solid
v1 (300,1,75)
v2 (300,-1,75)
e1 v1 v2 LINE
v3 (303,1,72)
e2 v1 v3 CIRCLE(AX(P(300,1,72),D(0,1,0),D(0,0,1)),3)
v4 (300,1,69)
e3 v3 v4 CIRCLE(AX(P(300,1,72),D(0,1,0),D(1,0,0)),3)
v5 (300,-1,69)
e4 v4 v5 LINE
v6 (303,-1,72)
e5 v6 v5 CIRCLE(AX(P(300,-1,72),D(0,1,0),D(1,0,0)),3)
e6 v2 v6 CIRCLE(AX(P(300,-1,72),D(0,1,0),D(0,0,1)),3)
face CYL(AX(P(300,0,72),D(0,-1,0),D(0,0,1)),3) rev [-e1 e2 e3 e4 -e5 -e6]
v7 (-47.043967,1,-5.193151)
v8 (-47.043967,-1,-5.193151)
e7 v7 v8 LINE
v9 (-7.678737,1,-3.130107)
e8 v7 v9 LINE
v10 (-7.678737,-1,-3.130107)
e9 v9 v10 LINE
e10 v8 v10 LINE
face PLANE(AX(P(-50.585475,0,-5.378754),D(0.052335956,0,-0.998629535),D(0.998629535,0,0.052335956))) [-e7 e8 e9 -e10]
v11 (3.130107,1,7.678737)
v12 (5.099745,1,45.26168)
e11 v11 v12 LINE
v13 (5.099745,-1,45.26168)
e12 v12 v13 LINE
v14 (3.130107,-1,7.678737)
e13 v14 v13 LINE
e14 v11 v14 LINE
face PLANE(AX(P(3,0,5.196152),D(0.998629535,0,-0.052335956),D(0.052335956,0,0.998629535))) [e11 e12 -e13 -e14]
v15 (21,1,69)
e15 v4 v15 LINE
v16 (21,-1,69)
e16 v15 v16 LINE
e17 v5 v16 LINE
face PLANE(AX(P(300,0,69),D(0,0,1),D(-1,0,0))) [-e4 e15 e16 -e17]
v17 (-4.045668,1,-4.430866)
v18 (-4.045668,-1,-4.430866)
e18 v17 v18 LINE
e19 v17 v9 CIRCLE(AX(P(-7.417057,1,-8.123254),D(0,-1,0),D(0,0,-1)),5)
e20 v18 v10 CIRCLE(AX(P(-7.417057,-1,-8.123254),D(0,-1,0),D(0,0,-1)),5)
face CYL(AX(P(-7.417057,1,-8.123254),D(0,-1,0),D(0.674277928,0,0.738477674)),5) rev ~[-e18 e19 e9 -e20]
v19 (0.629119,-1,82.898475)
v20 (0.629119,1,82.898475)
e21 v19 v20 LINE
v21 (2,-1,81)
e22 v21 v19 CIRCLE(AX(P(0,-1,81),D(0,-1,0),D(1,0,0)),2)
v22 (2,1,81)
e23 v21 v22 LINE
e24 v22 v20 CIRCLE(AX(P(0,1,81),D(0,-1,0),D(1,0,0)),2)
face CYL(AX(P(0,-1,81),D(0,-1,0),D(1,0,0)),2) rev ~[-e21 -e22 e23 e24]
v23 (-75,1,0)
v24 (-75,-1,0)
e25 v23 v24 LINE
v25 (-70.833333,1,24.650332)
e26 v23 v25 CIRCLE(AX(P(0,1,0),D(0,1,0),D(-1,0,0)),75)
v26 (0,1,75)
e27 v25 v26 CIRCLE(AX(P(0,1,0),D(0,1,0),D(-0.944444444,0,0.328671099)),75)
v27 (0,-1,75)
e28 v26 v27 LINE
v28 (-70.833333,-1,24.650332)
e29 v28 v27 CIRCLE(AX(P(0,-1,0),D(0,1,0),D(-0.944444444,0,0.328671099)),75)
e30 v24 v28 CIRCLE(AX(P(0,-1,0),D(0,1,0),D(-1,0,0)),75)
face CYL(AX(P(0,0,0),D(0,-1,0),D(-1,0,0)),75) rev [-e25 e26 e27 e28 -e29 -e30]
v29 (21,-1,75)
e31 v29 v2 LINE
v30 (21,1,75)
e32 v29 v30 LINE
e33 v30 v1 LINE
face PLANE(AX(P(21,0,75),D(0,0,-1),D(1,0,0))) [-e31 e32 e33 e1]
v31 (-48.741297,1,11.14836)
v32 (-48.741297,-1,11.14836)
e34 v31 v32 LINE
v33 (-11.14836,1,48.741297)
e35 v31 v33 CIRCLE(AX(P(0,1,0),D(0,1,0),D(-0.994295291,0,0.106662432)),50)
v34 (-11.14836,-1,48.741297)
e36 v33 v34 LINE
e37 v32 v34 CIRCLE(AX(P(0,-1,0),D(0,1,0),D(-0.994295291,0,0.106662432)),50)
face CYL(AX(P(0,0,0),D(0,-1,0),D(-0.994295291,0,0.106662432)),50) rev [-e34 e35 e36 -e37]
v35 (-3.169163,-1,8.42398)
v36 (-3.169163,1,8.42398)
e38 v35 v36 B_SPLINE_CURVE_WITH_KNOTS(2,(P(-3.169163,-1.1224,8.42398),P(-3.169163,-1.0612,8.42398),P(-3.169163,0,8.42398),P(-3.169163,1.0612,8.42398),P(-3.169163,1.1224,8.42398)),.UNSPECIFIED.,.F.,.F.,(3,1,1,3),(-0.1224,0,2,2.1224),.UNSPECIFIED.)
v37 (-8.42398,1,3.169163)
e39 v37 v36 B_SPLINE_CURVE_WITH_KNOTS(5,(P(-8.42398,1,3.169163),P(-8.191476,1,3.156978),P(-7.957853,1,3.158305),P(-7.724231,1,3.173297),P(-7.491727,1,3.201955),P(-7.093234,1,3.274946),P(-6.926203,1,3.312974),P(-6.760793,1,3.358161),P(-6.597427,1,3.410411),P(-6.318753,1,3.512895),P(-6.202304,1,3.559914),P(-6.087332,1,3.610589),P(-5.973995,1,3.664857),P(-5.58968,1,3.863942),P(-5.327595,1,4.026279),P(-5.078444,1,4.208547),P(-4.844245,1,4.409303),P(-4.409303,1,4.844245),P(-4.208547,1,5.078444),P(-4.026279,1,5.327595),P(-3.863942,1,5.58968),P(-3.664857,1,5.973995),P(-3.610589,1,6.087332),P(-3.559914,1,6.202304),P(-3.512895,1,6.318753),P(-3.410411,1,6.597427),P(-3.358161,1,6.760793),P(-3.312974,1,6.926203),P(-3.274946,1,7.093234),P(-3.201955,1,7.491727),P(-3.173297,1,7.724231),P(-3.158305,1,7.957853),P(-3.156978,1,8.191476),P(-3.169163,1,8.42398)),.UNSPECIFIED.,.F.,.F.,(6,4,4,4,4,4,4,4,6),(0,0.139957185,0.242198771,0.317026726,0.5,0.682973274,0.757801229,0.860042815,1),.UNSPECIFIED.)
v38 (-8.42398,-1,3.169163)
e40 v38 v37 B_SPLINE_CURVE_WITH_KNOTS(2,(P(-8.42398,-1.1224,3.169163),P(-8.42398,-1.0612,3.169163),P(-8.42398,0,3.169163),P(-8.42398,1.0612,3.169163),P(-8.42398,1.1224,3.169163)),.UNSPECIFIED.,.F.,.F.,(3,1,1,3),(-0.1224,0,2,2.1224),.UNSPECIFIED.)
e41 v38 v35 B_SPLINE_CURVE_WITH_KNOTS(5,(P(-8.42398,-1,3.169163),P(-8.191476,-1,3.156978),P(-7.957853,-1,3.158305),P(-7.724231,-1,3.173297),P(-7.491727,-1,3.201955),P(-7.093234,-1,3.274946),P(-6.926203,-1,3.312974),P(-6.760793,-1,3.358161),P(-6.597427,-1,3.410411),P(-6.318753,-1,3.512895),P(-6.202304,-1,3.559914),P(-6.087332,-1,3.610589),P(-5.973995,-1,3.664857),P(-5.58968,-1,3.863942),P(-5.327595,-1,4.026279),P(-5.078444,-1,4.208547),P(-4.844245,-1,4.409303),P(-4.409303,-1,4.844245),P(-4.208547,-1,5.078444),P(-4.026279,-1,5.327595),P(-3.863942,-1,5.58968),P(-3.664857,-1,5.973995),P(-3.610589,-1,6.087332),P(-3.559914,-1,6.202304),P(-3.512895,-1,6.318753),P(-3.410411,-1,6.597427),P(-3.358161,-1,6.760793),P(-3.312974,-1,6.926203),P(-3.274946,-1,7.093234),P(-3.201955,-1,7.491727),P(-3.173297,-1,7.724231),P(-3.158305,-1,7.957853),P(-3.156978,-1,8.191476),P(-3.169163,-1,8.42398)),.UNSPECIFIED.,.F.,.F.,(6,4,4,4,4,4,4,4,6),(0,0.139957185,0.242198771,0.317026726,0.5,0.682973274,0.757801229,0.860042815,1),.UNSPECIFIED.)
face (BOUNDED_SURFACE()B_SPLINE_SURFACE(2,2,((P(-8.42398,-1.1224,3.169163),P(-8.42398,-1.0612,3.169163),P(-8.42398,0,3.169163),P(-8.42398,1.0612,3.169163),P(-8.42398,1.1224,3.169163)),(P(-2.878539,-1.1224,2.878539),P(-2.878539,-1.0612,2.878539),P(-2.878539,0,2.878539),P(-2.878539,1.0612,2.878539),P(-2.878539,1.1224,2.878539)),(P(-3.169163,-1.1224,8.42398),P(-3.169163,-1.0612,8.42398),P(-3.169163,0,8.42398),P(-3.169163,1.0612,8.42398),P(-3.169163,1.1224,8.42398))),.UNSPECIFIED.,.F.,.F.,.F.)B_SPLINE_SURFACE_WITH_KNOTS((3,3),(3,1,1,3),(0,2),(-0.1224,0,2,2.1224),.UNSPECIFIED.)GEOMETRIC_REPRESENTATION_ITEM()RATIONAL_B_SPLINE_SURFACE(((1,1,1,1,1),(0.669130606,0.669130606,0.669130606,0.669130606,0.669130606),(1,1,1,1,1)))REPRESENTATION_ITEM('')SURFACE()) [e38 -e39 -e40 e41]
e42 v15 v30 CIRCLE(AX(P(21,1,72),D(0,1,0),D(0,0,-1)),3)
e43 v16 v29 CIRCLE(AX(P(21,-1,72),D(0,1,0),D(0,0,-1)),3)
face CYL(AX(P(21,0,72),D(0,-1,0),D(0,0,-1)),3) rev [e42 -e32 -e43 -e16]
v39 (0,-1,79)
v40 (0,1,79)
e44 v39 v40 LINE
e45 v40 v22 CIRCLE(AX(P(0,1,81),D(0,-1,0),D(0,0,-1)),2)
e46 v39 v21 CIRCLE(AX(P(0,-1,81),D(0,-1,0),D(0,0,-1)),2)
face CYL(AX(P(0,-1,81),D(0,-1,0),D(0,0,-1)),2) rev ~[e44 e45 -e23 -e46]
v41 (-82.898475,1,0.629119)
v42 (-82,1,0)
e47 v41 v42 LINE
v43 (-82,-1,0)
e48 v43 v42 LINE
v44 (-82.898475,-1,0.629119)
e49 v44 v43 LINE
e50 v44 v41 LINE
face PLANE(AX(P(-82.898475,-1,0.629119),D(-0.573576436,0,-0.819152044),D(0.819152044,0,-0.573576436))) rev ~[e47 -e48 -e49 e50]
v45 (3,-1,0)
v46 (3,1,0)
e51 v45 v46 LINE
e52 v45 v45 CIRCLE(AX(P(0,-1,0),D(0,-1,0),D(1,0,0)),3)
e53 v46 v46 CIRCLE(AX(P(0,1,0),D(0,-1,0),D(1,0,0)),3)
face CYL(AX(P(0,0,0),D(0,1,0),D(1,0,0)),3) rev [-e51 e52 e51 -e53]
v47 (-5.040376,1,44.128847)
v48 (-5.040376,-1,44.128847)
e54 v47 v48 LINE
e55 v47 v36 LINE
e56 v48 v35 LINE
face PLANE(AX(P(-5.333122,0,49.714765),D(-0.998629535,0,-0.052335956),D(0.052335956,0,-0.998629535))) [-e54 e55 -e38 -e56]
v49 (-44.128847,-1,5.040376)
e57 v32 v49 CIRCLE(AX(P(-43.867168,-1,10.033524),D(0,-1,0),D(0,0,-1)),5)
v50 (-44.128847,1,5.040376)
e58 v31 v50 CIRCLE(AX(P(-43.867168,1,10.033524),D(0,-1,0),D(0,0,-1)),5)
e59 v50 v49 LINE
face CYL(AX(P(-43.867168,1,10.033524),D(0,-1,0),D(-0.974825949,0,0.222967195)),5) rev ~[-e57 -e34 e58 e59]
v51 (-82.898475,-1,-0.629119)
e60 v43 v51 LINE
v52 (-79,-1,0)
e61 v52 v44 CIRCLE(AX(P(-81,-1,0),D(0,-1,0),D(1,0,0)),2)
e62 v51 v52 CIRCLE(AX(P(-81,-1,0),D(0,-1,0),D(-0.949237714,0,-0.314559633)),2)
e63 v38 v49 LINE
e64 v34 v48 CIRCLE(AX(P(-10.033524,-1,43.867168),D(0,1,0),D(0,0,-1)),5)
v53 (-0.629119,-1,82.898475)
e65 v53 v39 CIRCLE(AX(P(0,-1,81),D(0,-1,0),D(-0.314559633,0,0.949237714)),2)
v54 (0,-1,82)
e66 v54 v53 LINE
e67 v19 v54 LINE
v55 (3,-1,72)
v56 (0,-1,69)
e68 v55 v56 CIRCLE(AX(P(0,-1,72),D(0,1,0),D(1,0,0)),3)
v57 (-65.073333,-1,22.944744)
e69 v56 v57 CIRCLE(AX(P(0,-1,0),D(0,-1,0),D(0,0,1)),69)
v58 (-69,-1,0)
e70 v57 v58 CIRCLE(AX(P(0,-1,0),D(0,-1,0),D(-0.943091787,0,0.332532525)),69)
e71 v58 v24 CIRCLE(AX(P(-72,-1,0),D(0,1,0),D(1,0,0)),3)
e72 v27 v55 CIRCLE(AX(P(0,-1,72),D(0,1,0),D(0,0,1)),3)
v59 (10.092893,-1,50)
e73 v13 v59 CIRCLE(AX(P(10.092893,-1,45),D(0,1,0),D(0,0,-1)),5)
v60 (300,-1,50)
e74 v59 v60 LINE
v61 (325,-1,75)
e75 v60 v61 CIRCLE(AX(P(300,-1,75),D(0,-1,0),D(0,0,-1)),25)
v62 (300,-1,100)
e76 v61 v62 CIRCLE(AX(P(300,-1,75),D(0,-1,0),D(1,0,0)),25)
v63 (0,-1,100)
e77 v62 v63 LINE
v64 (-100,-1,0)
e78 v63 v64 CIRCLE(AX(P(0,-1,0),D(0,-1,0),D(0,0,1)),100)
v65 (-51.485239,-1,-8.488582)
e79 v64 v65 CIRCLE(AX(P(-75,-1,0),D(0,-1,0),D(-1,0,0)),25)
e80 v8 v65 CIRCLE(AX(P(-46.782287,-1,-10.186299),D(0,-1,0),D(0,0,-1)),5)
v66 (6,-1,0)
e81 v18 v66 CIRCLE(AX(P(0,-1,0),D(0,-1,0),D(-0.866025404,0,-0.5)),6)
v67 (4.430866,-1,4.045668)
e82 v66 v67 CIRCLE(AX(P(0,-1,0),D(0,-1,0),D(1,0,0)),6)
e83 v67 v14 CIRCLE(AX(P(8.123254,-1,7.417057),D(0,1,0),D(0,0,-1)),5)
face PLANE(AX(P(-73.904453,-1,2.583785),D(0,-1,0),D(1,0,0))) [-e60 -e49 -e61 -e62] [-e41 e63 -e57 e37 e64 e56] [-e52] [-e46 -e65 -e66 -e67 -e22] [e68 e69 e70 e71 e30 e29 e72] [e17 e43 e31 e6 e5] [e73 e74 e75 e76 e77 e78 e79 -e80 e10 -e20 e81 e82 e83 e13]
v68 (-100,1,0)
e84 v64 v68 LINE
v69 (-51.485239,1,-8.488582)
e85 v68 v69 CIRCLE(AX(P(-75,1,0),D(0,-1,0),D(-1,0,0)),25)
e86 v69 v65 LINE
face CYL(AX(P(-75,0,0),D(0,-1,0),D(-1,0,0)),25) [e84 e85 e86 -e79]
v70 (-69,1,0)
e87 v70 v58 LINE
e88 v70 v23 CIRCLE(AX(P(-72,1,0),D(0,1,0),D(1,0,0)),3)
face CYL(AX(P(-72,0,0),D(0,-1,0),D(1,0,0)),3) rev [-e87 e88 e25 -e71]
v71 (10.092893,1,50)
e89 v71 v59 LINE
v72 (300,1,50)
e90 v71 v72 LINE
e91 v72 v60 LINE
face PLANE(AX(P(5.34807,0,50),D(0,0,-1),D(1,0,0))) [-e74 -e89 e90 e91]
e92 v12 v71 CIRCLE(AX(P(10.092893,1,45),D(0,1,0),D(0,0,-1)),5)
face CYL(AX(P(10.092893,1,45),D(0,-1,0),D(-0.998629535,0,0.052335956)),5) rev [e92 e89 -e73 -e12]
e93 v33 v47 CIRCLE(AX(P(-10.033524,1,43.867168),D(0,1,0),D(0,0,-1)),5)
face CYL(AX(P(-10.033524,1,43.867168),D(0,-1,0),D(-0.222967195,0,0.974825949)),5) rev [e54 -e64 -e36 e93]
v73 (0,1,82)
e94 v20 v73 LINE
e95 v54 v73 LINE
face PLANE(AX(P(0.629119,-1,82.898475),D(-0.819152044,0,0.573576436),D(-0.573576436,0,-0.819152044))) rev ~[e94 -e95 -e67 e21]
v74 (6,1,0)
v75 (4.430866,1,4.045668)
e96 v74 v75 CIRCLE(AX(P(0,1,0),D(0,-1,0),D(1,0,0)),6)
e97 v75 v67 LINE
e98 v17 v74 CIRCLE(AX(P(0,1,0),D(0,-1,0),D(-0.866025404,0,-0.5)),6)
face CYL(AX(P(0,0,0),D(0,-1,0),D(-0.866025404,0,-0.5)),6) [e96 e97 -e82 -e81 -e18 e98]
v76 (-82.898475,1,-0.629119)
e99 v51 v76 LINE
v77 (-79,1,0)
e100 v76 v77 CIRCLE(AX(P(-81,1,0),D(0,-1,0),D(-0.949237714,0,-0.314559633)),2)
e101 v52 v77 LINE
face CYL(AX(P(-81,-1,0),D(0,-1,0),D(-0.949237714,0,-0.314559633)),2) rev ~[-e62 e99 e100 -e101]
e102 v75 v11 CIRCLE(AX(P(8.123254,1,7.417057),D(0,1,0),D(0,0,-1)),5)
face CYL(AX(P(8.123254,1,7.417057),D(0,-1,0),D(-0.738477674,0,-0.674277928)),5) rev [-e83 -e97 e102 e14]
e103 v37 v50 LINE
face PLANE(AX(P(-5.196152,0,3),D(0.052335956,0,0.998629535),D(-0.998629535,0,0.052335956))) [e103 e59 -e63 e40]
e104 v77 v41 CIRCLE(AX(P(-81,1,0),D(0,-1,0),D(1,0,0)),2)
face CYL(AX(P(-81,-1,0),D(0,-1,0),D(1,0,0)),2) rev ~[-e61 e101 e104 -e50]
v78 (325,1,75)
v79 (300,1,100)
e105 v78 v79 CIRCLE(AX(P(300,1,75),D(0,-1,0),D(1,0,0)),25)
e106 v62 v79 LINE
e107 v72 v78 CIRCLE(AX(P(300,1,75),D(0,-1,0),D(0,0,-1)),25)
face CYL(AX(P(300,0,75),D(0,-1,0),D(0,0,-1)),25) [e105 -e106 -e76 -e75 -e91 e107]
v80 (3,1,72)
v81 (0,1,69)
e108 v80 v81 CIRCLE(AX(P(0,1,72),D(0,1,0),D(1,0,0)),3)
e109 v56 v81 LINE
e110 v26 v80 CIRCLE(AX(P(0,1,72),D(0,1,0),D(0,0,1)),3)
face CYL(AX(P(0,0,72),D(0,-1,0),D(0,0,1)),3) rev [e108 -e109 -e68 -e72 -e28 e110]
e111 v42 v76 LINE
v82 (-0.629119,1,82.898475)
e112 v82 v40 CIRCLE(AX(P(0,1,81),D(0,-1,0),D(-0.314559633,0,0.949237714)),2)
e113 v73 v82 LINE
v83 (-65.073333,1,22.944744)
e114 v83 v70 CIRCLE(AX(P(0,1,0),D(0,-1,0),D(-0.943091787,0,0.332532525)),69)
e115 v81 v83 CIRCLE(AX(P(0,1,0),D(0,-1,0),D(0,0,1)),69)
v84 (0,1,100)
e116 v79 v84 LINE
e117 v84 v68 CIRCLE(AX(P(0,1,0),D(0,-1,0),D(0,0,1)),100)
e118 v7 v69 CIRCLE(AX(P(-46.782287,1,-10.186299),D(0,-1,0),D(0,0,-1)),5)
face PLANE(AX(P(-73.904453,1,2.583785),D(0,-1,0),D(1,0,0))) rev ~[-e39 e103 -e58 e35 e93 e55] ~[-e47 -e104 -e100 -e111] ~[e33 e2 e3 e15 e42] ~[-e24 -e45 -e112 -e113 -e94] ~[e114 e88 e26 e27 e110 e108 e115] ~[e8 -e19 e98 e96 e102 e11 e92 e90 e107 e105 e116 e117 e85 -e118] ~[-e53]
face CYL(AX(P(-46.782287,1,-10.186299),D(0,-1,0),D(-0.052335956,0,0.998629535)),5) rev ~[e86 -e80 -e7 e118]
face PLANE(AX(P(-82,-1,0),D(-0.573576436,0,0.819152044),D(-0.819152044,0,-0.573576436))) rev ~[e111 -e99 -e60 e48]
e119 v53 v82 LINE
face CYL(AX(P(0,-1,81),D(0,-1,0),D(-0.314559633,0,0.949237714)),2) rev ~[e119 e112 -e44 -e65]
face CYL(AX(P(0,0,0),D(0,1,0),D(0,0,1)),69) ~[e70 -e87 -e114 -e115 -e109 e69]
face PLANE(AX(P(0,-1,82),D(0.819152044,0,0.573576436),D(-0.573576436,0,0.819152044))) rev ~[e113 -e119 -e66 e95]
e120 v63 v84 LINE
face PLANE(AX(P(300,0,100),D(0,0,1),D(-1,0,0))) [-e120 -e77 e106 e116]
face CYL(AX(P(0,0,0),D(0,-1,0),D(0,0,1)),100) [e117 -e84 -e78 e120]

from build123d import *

# Parameters (mm, degrees)
F0_R     = 3
F1_DEPTH = 1
F2_R     = 5
F2_R_2   = 4.99999
F6_DEPTH = 25


# Not quite as in the source:
# - a fillet or chamfer is up to 0.001 mm smaller than in the source, because OpenCascade refuses the exact size
# - a feature of the source that left no trace in its solid (it failed there, or was rolled back) is left out


with BuildPart() as f1:
    # F0 (on Front) → F1 (new body, symmetric)
    with BuildSketch(Plane.XZ):
        with BuildLine():
            ThreePointArc((-70.8333333333, 24.6503324296), (-91.1374306092, 19.0940653956), (-100, 0))
            ThreePointArc((-100, 0), (-77.7052620956, -24.8532001359), (-50.5854754405, -5.3787536225))
            ThreePointArc((-50.5854754405, -5.3787536225), (-50.1467998641, -2.7052620956), (-50, 0))
            ThreePointArc((-50, 0), (-54.1054233512, 13.7264950613), (-65.0733333333, 22.9447442542))
            ThreePointArc((-65.0733333333, 22.9447442542), (-68.0112490695, 11.6391580452), (-69, 0))
            ThreePointArc((-69, 0), (-72, -3), (-75, 0))
            ThreePointArc((-75, 0), (-73.9509972887, 12.5), (-70.8333333333, 24.6503324296))
        make_face()
        with BuildLine():
            ThreePointArc((-50, 0), (-50.1467998641, -2.7052620956), (-50.5854754405, -5.3787536225))
            Line((-50.5854754405, -5.3787536225), (-5.1961524227, -3))
            ThreePointArc((-5.1961524227, -3), (-6, 0), (-5.1961524227, 3))
            Line((-5.1961524227, 3), (-49.7147645476, 5.3331215982))
            ThreePointArc((-49.7147645476, 5.3331215982), (-49.9286402147, 2.6703719425), (-50, 0))
        make_face()
        with BuildLine():
            Line((300, 100), (0, 100))
            ThreePointArc((0, 100), (-70.7106781187, 70.7106781187), (-100, 0))
            ThreePointArc((-100, 0), (-91.1374306092, 19.0940653956), (-70.8333333333, 24.6503324296))
            ThreePointArc((-70.8333333333, 24.6503324296), (-43.4524168935, 61.1300864232), (0, 75))
            ThreePointArc((0, 75), (2.1213203436, 74.1213203436), (3, 72))
            ThreePointArc((3, 72), (2.1213203436, 69.8786796564), (0, 69))
            ThreePointArc((0, 69), (-39.861087833, 56.3213429951), (-65.0733333333, 22.9447442542))
            ThreePointArc((-65.0733333333, 22.9447442542), (-54.1054233512, 13.7264950613), (-50, 0))
            ThreePointArc((-50, 0), (-49.9286402147, 2.6703719425), (-49.7147645476, 5.3331215982))
            ThreePointArc((-49.7147645476, 5.3331215982), (-35.3553390593, 35.3553390593), (-5.3331215982, 49.7147645476))
            ThreePointArc((-5.3331215982, 49.7147645476), (-2.6703719425, 49.9286402147), (0, 50))
            Line((0, 50), (5.3480701549, 50))
            Line((5.3480701549, 50), (300, 50))
            ThreePointArc((300, 50), (284.5889649926, 55.314980315), (275.730677801, 69))
            Line((275.730677801, 69), (21, 69))
            ThreePointArc((21, 69), (18, 72), (21, 75))
            Line((21, 75), (275, 75))
            ThreePointArc((275, 75), (282.3223304703, 92.6776695297), (300, 100))
        make_face()
        with BuildLine():
            Line((3, 5.1961524227), (5.3480701549, 50))
            Line((5.3480701549, 50), (0, 50))
            ThreePointArc((0, 50), (-2.6703719425, 49.9286402147), (-5.3331215982, 49.7147645476))
            Line((-5.3331215982, 49.7147645476), (-3, 5.1961524227))
            ThreePointArc((-3, 5.1961524227), (0, 6), (3, 5.1961524227))
        make_face()
        with BuildLine():
            ThreePointArc((-5.1961524227, 3), (-6, 0), (-5.1961524227, -3))
            ThreePointArc((-5.1961524227, -3), (1.5529142706, -5.7955549577), (6, 0))
            ThreePointArc((6, 0), (5.1961524227, 3), (3, 5.1961524227))
            ThreePointArc((3, 5.1961524227), (0, 6), (-3, 5.1961524227))
            ThreePointArc((-3, 5.1961524227), (-4.2426406871, 4.2426406871), (-5.1961524227, 3))
        make_face()
        Circle(F0_R, mode=Mode.SUBTRACT)
        with BuildLine():
            ThreePointArc((325, 75), (317.6776695297, 92.6776695297), (300, 100))
            ThreePointArc((300, 100), (282.3223304703, 92.6776695297), (275, 75))
            Line((275, 75), (300, 75))
            ThreePointArc((300, 75), (302.1213203436, 74.1213203436), (303, 72))
            ThreePointArc((303, 72), (302.1213203436, 69.8786796564), (300, 69))
            Line((300, 69), (275.730677801, 69))
            ThreePointArc((275.730677801, 69), (284.5889649926, 55.314980315), (300, 50))
            ThreePointArc((300, 50), (317.6776695297, 57.3223304703), (325, 75))
        make_face()
    extrude(amount=F1_DEPTH, both=True)

    # F2 (call 1 of 8: OpenCascade refuses the feature's edges together)
    f2_edges = [f1.edges().sort_by_distance(p)[0] for p in [
        (-49.714765, 0, 5.333122),
    ]]
    fillet(f2_edges, radius=F2_R)

    # F2#2 (call 2 of 8)
    f2_2_edges = [f1.edges().sort_by_distance(p)[0] for p in [
        (5.34807, 0, 50),
    ]]
    fillet(f2_2_edges, radius=F2_R)

    # F2#3 (call 3 of 8)
    f2_3_edges = [f1.edges().sort_by_distance(p)[0] for p in [
        (-5.333122, 0, 49.714765),
    ]]
    fillet(f2_3_edges, radius=F2_R)

    # F2#4 (call 4 of 8)
    f2_4_edges = [f1.edges().sort_by_distance(p)[0] for p in [
        (-5.196152, 0, -3),
    ]]
    fillet(f2_4_edges, radius=F2_R)

    # F2#5 (call 5 of 8)
    f2_5_edges = [f1.edges().sort_by_distance(p)[0] for p in [
        (-50.585475, 0, -5.378754),
    ]]
    fillet(f2_5_edges, radius=F2_R)

    # F2#6 (call 6 of 8)
    f2_6_edges = [f1.edges().sort_by_distance(p)[0] for p in [
        (-5.196152, 0, 3),
    ]]
    fillet(f2_6_edges, radius=F2_R)

    # F2#7 (call 7 of 8) (radius 5 in the source; OpenCascade refuses exactly that, so slightly less here)
    f2_7_edges = [f1.edges().sort_by_distance(p)[0] for p in [
        (-3, 0, 5.196152),
    ]]
    fillet(f2_7_edges, radius=F2_R_2)

    # F2#8 (call 8 of 8)
    f2_8_edges = [f1.edges().sort_by_distance(p)[0] for p in [
        (3, 0, 5.196152),
    ]]
    fillet(f2_8_edges, radius=F2_R)

    # F5 (on face) → F6 (cut)
    with BuildSketch(Plane.XZ.offset(1)):
        with BuildLine():
            Line((-82, 0), (-79, 0))
            ThreePointArc((-79, 0), (-80.6813707911, 1.9744557294), (-82.8984754272, 0.629119267))
            Line((-82.8984754272, 0.629119267), (-82, 0))
        make_face()
        with BuildLine():
            ThreePointArc((-82.8984754272, -0.629119267), (-80.6813707911, -1.9744557294), (-79, 0))
            Line((-79, 0), (-82, 0))
            Line((-82, 0), (-82.8984754272, -0.629119267))
        make_face()
        with BuildLine():
            ThreePointArc((-0.629119267, 82.8984754272), (-1.9744557294, 80.6813707911), (0, 79))
            Line((0, 79), (0, 82))
            Line((0, 82), (-0.629119267, 82.8984754272))
        make_face()
        with BuildLine():
            Line((0, 82), (0, 79))
            ThreePointArc((0, 79), (1.4142135624, 79.5857864376), (2, 81))
            ThreePointArc((2, 81), (1.6214559097, 82.1708461611), (0.629119267, 82.8984754272))
            Line((0.629119267, 82.8984754272), (0, 82))
        make_face()
    extrude(amount=-F6_DEPTH, mode=Mode.SUBTRACT)


solid = f1.part
